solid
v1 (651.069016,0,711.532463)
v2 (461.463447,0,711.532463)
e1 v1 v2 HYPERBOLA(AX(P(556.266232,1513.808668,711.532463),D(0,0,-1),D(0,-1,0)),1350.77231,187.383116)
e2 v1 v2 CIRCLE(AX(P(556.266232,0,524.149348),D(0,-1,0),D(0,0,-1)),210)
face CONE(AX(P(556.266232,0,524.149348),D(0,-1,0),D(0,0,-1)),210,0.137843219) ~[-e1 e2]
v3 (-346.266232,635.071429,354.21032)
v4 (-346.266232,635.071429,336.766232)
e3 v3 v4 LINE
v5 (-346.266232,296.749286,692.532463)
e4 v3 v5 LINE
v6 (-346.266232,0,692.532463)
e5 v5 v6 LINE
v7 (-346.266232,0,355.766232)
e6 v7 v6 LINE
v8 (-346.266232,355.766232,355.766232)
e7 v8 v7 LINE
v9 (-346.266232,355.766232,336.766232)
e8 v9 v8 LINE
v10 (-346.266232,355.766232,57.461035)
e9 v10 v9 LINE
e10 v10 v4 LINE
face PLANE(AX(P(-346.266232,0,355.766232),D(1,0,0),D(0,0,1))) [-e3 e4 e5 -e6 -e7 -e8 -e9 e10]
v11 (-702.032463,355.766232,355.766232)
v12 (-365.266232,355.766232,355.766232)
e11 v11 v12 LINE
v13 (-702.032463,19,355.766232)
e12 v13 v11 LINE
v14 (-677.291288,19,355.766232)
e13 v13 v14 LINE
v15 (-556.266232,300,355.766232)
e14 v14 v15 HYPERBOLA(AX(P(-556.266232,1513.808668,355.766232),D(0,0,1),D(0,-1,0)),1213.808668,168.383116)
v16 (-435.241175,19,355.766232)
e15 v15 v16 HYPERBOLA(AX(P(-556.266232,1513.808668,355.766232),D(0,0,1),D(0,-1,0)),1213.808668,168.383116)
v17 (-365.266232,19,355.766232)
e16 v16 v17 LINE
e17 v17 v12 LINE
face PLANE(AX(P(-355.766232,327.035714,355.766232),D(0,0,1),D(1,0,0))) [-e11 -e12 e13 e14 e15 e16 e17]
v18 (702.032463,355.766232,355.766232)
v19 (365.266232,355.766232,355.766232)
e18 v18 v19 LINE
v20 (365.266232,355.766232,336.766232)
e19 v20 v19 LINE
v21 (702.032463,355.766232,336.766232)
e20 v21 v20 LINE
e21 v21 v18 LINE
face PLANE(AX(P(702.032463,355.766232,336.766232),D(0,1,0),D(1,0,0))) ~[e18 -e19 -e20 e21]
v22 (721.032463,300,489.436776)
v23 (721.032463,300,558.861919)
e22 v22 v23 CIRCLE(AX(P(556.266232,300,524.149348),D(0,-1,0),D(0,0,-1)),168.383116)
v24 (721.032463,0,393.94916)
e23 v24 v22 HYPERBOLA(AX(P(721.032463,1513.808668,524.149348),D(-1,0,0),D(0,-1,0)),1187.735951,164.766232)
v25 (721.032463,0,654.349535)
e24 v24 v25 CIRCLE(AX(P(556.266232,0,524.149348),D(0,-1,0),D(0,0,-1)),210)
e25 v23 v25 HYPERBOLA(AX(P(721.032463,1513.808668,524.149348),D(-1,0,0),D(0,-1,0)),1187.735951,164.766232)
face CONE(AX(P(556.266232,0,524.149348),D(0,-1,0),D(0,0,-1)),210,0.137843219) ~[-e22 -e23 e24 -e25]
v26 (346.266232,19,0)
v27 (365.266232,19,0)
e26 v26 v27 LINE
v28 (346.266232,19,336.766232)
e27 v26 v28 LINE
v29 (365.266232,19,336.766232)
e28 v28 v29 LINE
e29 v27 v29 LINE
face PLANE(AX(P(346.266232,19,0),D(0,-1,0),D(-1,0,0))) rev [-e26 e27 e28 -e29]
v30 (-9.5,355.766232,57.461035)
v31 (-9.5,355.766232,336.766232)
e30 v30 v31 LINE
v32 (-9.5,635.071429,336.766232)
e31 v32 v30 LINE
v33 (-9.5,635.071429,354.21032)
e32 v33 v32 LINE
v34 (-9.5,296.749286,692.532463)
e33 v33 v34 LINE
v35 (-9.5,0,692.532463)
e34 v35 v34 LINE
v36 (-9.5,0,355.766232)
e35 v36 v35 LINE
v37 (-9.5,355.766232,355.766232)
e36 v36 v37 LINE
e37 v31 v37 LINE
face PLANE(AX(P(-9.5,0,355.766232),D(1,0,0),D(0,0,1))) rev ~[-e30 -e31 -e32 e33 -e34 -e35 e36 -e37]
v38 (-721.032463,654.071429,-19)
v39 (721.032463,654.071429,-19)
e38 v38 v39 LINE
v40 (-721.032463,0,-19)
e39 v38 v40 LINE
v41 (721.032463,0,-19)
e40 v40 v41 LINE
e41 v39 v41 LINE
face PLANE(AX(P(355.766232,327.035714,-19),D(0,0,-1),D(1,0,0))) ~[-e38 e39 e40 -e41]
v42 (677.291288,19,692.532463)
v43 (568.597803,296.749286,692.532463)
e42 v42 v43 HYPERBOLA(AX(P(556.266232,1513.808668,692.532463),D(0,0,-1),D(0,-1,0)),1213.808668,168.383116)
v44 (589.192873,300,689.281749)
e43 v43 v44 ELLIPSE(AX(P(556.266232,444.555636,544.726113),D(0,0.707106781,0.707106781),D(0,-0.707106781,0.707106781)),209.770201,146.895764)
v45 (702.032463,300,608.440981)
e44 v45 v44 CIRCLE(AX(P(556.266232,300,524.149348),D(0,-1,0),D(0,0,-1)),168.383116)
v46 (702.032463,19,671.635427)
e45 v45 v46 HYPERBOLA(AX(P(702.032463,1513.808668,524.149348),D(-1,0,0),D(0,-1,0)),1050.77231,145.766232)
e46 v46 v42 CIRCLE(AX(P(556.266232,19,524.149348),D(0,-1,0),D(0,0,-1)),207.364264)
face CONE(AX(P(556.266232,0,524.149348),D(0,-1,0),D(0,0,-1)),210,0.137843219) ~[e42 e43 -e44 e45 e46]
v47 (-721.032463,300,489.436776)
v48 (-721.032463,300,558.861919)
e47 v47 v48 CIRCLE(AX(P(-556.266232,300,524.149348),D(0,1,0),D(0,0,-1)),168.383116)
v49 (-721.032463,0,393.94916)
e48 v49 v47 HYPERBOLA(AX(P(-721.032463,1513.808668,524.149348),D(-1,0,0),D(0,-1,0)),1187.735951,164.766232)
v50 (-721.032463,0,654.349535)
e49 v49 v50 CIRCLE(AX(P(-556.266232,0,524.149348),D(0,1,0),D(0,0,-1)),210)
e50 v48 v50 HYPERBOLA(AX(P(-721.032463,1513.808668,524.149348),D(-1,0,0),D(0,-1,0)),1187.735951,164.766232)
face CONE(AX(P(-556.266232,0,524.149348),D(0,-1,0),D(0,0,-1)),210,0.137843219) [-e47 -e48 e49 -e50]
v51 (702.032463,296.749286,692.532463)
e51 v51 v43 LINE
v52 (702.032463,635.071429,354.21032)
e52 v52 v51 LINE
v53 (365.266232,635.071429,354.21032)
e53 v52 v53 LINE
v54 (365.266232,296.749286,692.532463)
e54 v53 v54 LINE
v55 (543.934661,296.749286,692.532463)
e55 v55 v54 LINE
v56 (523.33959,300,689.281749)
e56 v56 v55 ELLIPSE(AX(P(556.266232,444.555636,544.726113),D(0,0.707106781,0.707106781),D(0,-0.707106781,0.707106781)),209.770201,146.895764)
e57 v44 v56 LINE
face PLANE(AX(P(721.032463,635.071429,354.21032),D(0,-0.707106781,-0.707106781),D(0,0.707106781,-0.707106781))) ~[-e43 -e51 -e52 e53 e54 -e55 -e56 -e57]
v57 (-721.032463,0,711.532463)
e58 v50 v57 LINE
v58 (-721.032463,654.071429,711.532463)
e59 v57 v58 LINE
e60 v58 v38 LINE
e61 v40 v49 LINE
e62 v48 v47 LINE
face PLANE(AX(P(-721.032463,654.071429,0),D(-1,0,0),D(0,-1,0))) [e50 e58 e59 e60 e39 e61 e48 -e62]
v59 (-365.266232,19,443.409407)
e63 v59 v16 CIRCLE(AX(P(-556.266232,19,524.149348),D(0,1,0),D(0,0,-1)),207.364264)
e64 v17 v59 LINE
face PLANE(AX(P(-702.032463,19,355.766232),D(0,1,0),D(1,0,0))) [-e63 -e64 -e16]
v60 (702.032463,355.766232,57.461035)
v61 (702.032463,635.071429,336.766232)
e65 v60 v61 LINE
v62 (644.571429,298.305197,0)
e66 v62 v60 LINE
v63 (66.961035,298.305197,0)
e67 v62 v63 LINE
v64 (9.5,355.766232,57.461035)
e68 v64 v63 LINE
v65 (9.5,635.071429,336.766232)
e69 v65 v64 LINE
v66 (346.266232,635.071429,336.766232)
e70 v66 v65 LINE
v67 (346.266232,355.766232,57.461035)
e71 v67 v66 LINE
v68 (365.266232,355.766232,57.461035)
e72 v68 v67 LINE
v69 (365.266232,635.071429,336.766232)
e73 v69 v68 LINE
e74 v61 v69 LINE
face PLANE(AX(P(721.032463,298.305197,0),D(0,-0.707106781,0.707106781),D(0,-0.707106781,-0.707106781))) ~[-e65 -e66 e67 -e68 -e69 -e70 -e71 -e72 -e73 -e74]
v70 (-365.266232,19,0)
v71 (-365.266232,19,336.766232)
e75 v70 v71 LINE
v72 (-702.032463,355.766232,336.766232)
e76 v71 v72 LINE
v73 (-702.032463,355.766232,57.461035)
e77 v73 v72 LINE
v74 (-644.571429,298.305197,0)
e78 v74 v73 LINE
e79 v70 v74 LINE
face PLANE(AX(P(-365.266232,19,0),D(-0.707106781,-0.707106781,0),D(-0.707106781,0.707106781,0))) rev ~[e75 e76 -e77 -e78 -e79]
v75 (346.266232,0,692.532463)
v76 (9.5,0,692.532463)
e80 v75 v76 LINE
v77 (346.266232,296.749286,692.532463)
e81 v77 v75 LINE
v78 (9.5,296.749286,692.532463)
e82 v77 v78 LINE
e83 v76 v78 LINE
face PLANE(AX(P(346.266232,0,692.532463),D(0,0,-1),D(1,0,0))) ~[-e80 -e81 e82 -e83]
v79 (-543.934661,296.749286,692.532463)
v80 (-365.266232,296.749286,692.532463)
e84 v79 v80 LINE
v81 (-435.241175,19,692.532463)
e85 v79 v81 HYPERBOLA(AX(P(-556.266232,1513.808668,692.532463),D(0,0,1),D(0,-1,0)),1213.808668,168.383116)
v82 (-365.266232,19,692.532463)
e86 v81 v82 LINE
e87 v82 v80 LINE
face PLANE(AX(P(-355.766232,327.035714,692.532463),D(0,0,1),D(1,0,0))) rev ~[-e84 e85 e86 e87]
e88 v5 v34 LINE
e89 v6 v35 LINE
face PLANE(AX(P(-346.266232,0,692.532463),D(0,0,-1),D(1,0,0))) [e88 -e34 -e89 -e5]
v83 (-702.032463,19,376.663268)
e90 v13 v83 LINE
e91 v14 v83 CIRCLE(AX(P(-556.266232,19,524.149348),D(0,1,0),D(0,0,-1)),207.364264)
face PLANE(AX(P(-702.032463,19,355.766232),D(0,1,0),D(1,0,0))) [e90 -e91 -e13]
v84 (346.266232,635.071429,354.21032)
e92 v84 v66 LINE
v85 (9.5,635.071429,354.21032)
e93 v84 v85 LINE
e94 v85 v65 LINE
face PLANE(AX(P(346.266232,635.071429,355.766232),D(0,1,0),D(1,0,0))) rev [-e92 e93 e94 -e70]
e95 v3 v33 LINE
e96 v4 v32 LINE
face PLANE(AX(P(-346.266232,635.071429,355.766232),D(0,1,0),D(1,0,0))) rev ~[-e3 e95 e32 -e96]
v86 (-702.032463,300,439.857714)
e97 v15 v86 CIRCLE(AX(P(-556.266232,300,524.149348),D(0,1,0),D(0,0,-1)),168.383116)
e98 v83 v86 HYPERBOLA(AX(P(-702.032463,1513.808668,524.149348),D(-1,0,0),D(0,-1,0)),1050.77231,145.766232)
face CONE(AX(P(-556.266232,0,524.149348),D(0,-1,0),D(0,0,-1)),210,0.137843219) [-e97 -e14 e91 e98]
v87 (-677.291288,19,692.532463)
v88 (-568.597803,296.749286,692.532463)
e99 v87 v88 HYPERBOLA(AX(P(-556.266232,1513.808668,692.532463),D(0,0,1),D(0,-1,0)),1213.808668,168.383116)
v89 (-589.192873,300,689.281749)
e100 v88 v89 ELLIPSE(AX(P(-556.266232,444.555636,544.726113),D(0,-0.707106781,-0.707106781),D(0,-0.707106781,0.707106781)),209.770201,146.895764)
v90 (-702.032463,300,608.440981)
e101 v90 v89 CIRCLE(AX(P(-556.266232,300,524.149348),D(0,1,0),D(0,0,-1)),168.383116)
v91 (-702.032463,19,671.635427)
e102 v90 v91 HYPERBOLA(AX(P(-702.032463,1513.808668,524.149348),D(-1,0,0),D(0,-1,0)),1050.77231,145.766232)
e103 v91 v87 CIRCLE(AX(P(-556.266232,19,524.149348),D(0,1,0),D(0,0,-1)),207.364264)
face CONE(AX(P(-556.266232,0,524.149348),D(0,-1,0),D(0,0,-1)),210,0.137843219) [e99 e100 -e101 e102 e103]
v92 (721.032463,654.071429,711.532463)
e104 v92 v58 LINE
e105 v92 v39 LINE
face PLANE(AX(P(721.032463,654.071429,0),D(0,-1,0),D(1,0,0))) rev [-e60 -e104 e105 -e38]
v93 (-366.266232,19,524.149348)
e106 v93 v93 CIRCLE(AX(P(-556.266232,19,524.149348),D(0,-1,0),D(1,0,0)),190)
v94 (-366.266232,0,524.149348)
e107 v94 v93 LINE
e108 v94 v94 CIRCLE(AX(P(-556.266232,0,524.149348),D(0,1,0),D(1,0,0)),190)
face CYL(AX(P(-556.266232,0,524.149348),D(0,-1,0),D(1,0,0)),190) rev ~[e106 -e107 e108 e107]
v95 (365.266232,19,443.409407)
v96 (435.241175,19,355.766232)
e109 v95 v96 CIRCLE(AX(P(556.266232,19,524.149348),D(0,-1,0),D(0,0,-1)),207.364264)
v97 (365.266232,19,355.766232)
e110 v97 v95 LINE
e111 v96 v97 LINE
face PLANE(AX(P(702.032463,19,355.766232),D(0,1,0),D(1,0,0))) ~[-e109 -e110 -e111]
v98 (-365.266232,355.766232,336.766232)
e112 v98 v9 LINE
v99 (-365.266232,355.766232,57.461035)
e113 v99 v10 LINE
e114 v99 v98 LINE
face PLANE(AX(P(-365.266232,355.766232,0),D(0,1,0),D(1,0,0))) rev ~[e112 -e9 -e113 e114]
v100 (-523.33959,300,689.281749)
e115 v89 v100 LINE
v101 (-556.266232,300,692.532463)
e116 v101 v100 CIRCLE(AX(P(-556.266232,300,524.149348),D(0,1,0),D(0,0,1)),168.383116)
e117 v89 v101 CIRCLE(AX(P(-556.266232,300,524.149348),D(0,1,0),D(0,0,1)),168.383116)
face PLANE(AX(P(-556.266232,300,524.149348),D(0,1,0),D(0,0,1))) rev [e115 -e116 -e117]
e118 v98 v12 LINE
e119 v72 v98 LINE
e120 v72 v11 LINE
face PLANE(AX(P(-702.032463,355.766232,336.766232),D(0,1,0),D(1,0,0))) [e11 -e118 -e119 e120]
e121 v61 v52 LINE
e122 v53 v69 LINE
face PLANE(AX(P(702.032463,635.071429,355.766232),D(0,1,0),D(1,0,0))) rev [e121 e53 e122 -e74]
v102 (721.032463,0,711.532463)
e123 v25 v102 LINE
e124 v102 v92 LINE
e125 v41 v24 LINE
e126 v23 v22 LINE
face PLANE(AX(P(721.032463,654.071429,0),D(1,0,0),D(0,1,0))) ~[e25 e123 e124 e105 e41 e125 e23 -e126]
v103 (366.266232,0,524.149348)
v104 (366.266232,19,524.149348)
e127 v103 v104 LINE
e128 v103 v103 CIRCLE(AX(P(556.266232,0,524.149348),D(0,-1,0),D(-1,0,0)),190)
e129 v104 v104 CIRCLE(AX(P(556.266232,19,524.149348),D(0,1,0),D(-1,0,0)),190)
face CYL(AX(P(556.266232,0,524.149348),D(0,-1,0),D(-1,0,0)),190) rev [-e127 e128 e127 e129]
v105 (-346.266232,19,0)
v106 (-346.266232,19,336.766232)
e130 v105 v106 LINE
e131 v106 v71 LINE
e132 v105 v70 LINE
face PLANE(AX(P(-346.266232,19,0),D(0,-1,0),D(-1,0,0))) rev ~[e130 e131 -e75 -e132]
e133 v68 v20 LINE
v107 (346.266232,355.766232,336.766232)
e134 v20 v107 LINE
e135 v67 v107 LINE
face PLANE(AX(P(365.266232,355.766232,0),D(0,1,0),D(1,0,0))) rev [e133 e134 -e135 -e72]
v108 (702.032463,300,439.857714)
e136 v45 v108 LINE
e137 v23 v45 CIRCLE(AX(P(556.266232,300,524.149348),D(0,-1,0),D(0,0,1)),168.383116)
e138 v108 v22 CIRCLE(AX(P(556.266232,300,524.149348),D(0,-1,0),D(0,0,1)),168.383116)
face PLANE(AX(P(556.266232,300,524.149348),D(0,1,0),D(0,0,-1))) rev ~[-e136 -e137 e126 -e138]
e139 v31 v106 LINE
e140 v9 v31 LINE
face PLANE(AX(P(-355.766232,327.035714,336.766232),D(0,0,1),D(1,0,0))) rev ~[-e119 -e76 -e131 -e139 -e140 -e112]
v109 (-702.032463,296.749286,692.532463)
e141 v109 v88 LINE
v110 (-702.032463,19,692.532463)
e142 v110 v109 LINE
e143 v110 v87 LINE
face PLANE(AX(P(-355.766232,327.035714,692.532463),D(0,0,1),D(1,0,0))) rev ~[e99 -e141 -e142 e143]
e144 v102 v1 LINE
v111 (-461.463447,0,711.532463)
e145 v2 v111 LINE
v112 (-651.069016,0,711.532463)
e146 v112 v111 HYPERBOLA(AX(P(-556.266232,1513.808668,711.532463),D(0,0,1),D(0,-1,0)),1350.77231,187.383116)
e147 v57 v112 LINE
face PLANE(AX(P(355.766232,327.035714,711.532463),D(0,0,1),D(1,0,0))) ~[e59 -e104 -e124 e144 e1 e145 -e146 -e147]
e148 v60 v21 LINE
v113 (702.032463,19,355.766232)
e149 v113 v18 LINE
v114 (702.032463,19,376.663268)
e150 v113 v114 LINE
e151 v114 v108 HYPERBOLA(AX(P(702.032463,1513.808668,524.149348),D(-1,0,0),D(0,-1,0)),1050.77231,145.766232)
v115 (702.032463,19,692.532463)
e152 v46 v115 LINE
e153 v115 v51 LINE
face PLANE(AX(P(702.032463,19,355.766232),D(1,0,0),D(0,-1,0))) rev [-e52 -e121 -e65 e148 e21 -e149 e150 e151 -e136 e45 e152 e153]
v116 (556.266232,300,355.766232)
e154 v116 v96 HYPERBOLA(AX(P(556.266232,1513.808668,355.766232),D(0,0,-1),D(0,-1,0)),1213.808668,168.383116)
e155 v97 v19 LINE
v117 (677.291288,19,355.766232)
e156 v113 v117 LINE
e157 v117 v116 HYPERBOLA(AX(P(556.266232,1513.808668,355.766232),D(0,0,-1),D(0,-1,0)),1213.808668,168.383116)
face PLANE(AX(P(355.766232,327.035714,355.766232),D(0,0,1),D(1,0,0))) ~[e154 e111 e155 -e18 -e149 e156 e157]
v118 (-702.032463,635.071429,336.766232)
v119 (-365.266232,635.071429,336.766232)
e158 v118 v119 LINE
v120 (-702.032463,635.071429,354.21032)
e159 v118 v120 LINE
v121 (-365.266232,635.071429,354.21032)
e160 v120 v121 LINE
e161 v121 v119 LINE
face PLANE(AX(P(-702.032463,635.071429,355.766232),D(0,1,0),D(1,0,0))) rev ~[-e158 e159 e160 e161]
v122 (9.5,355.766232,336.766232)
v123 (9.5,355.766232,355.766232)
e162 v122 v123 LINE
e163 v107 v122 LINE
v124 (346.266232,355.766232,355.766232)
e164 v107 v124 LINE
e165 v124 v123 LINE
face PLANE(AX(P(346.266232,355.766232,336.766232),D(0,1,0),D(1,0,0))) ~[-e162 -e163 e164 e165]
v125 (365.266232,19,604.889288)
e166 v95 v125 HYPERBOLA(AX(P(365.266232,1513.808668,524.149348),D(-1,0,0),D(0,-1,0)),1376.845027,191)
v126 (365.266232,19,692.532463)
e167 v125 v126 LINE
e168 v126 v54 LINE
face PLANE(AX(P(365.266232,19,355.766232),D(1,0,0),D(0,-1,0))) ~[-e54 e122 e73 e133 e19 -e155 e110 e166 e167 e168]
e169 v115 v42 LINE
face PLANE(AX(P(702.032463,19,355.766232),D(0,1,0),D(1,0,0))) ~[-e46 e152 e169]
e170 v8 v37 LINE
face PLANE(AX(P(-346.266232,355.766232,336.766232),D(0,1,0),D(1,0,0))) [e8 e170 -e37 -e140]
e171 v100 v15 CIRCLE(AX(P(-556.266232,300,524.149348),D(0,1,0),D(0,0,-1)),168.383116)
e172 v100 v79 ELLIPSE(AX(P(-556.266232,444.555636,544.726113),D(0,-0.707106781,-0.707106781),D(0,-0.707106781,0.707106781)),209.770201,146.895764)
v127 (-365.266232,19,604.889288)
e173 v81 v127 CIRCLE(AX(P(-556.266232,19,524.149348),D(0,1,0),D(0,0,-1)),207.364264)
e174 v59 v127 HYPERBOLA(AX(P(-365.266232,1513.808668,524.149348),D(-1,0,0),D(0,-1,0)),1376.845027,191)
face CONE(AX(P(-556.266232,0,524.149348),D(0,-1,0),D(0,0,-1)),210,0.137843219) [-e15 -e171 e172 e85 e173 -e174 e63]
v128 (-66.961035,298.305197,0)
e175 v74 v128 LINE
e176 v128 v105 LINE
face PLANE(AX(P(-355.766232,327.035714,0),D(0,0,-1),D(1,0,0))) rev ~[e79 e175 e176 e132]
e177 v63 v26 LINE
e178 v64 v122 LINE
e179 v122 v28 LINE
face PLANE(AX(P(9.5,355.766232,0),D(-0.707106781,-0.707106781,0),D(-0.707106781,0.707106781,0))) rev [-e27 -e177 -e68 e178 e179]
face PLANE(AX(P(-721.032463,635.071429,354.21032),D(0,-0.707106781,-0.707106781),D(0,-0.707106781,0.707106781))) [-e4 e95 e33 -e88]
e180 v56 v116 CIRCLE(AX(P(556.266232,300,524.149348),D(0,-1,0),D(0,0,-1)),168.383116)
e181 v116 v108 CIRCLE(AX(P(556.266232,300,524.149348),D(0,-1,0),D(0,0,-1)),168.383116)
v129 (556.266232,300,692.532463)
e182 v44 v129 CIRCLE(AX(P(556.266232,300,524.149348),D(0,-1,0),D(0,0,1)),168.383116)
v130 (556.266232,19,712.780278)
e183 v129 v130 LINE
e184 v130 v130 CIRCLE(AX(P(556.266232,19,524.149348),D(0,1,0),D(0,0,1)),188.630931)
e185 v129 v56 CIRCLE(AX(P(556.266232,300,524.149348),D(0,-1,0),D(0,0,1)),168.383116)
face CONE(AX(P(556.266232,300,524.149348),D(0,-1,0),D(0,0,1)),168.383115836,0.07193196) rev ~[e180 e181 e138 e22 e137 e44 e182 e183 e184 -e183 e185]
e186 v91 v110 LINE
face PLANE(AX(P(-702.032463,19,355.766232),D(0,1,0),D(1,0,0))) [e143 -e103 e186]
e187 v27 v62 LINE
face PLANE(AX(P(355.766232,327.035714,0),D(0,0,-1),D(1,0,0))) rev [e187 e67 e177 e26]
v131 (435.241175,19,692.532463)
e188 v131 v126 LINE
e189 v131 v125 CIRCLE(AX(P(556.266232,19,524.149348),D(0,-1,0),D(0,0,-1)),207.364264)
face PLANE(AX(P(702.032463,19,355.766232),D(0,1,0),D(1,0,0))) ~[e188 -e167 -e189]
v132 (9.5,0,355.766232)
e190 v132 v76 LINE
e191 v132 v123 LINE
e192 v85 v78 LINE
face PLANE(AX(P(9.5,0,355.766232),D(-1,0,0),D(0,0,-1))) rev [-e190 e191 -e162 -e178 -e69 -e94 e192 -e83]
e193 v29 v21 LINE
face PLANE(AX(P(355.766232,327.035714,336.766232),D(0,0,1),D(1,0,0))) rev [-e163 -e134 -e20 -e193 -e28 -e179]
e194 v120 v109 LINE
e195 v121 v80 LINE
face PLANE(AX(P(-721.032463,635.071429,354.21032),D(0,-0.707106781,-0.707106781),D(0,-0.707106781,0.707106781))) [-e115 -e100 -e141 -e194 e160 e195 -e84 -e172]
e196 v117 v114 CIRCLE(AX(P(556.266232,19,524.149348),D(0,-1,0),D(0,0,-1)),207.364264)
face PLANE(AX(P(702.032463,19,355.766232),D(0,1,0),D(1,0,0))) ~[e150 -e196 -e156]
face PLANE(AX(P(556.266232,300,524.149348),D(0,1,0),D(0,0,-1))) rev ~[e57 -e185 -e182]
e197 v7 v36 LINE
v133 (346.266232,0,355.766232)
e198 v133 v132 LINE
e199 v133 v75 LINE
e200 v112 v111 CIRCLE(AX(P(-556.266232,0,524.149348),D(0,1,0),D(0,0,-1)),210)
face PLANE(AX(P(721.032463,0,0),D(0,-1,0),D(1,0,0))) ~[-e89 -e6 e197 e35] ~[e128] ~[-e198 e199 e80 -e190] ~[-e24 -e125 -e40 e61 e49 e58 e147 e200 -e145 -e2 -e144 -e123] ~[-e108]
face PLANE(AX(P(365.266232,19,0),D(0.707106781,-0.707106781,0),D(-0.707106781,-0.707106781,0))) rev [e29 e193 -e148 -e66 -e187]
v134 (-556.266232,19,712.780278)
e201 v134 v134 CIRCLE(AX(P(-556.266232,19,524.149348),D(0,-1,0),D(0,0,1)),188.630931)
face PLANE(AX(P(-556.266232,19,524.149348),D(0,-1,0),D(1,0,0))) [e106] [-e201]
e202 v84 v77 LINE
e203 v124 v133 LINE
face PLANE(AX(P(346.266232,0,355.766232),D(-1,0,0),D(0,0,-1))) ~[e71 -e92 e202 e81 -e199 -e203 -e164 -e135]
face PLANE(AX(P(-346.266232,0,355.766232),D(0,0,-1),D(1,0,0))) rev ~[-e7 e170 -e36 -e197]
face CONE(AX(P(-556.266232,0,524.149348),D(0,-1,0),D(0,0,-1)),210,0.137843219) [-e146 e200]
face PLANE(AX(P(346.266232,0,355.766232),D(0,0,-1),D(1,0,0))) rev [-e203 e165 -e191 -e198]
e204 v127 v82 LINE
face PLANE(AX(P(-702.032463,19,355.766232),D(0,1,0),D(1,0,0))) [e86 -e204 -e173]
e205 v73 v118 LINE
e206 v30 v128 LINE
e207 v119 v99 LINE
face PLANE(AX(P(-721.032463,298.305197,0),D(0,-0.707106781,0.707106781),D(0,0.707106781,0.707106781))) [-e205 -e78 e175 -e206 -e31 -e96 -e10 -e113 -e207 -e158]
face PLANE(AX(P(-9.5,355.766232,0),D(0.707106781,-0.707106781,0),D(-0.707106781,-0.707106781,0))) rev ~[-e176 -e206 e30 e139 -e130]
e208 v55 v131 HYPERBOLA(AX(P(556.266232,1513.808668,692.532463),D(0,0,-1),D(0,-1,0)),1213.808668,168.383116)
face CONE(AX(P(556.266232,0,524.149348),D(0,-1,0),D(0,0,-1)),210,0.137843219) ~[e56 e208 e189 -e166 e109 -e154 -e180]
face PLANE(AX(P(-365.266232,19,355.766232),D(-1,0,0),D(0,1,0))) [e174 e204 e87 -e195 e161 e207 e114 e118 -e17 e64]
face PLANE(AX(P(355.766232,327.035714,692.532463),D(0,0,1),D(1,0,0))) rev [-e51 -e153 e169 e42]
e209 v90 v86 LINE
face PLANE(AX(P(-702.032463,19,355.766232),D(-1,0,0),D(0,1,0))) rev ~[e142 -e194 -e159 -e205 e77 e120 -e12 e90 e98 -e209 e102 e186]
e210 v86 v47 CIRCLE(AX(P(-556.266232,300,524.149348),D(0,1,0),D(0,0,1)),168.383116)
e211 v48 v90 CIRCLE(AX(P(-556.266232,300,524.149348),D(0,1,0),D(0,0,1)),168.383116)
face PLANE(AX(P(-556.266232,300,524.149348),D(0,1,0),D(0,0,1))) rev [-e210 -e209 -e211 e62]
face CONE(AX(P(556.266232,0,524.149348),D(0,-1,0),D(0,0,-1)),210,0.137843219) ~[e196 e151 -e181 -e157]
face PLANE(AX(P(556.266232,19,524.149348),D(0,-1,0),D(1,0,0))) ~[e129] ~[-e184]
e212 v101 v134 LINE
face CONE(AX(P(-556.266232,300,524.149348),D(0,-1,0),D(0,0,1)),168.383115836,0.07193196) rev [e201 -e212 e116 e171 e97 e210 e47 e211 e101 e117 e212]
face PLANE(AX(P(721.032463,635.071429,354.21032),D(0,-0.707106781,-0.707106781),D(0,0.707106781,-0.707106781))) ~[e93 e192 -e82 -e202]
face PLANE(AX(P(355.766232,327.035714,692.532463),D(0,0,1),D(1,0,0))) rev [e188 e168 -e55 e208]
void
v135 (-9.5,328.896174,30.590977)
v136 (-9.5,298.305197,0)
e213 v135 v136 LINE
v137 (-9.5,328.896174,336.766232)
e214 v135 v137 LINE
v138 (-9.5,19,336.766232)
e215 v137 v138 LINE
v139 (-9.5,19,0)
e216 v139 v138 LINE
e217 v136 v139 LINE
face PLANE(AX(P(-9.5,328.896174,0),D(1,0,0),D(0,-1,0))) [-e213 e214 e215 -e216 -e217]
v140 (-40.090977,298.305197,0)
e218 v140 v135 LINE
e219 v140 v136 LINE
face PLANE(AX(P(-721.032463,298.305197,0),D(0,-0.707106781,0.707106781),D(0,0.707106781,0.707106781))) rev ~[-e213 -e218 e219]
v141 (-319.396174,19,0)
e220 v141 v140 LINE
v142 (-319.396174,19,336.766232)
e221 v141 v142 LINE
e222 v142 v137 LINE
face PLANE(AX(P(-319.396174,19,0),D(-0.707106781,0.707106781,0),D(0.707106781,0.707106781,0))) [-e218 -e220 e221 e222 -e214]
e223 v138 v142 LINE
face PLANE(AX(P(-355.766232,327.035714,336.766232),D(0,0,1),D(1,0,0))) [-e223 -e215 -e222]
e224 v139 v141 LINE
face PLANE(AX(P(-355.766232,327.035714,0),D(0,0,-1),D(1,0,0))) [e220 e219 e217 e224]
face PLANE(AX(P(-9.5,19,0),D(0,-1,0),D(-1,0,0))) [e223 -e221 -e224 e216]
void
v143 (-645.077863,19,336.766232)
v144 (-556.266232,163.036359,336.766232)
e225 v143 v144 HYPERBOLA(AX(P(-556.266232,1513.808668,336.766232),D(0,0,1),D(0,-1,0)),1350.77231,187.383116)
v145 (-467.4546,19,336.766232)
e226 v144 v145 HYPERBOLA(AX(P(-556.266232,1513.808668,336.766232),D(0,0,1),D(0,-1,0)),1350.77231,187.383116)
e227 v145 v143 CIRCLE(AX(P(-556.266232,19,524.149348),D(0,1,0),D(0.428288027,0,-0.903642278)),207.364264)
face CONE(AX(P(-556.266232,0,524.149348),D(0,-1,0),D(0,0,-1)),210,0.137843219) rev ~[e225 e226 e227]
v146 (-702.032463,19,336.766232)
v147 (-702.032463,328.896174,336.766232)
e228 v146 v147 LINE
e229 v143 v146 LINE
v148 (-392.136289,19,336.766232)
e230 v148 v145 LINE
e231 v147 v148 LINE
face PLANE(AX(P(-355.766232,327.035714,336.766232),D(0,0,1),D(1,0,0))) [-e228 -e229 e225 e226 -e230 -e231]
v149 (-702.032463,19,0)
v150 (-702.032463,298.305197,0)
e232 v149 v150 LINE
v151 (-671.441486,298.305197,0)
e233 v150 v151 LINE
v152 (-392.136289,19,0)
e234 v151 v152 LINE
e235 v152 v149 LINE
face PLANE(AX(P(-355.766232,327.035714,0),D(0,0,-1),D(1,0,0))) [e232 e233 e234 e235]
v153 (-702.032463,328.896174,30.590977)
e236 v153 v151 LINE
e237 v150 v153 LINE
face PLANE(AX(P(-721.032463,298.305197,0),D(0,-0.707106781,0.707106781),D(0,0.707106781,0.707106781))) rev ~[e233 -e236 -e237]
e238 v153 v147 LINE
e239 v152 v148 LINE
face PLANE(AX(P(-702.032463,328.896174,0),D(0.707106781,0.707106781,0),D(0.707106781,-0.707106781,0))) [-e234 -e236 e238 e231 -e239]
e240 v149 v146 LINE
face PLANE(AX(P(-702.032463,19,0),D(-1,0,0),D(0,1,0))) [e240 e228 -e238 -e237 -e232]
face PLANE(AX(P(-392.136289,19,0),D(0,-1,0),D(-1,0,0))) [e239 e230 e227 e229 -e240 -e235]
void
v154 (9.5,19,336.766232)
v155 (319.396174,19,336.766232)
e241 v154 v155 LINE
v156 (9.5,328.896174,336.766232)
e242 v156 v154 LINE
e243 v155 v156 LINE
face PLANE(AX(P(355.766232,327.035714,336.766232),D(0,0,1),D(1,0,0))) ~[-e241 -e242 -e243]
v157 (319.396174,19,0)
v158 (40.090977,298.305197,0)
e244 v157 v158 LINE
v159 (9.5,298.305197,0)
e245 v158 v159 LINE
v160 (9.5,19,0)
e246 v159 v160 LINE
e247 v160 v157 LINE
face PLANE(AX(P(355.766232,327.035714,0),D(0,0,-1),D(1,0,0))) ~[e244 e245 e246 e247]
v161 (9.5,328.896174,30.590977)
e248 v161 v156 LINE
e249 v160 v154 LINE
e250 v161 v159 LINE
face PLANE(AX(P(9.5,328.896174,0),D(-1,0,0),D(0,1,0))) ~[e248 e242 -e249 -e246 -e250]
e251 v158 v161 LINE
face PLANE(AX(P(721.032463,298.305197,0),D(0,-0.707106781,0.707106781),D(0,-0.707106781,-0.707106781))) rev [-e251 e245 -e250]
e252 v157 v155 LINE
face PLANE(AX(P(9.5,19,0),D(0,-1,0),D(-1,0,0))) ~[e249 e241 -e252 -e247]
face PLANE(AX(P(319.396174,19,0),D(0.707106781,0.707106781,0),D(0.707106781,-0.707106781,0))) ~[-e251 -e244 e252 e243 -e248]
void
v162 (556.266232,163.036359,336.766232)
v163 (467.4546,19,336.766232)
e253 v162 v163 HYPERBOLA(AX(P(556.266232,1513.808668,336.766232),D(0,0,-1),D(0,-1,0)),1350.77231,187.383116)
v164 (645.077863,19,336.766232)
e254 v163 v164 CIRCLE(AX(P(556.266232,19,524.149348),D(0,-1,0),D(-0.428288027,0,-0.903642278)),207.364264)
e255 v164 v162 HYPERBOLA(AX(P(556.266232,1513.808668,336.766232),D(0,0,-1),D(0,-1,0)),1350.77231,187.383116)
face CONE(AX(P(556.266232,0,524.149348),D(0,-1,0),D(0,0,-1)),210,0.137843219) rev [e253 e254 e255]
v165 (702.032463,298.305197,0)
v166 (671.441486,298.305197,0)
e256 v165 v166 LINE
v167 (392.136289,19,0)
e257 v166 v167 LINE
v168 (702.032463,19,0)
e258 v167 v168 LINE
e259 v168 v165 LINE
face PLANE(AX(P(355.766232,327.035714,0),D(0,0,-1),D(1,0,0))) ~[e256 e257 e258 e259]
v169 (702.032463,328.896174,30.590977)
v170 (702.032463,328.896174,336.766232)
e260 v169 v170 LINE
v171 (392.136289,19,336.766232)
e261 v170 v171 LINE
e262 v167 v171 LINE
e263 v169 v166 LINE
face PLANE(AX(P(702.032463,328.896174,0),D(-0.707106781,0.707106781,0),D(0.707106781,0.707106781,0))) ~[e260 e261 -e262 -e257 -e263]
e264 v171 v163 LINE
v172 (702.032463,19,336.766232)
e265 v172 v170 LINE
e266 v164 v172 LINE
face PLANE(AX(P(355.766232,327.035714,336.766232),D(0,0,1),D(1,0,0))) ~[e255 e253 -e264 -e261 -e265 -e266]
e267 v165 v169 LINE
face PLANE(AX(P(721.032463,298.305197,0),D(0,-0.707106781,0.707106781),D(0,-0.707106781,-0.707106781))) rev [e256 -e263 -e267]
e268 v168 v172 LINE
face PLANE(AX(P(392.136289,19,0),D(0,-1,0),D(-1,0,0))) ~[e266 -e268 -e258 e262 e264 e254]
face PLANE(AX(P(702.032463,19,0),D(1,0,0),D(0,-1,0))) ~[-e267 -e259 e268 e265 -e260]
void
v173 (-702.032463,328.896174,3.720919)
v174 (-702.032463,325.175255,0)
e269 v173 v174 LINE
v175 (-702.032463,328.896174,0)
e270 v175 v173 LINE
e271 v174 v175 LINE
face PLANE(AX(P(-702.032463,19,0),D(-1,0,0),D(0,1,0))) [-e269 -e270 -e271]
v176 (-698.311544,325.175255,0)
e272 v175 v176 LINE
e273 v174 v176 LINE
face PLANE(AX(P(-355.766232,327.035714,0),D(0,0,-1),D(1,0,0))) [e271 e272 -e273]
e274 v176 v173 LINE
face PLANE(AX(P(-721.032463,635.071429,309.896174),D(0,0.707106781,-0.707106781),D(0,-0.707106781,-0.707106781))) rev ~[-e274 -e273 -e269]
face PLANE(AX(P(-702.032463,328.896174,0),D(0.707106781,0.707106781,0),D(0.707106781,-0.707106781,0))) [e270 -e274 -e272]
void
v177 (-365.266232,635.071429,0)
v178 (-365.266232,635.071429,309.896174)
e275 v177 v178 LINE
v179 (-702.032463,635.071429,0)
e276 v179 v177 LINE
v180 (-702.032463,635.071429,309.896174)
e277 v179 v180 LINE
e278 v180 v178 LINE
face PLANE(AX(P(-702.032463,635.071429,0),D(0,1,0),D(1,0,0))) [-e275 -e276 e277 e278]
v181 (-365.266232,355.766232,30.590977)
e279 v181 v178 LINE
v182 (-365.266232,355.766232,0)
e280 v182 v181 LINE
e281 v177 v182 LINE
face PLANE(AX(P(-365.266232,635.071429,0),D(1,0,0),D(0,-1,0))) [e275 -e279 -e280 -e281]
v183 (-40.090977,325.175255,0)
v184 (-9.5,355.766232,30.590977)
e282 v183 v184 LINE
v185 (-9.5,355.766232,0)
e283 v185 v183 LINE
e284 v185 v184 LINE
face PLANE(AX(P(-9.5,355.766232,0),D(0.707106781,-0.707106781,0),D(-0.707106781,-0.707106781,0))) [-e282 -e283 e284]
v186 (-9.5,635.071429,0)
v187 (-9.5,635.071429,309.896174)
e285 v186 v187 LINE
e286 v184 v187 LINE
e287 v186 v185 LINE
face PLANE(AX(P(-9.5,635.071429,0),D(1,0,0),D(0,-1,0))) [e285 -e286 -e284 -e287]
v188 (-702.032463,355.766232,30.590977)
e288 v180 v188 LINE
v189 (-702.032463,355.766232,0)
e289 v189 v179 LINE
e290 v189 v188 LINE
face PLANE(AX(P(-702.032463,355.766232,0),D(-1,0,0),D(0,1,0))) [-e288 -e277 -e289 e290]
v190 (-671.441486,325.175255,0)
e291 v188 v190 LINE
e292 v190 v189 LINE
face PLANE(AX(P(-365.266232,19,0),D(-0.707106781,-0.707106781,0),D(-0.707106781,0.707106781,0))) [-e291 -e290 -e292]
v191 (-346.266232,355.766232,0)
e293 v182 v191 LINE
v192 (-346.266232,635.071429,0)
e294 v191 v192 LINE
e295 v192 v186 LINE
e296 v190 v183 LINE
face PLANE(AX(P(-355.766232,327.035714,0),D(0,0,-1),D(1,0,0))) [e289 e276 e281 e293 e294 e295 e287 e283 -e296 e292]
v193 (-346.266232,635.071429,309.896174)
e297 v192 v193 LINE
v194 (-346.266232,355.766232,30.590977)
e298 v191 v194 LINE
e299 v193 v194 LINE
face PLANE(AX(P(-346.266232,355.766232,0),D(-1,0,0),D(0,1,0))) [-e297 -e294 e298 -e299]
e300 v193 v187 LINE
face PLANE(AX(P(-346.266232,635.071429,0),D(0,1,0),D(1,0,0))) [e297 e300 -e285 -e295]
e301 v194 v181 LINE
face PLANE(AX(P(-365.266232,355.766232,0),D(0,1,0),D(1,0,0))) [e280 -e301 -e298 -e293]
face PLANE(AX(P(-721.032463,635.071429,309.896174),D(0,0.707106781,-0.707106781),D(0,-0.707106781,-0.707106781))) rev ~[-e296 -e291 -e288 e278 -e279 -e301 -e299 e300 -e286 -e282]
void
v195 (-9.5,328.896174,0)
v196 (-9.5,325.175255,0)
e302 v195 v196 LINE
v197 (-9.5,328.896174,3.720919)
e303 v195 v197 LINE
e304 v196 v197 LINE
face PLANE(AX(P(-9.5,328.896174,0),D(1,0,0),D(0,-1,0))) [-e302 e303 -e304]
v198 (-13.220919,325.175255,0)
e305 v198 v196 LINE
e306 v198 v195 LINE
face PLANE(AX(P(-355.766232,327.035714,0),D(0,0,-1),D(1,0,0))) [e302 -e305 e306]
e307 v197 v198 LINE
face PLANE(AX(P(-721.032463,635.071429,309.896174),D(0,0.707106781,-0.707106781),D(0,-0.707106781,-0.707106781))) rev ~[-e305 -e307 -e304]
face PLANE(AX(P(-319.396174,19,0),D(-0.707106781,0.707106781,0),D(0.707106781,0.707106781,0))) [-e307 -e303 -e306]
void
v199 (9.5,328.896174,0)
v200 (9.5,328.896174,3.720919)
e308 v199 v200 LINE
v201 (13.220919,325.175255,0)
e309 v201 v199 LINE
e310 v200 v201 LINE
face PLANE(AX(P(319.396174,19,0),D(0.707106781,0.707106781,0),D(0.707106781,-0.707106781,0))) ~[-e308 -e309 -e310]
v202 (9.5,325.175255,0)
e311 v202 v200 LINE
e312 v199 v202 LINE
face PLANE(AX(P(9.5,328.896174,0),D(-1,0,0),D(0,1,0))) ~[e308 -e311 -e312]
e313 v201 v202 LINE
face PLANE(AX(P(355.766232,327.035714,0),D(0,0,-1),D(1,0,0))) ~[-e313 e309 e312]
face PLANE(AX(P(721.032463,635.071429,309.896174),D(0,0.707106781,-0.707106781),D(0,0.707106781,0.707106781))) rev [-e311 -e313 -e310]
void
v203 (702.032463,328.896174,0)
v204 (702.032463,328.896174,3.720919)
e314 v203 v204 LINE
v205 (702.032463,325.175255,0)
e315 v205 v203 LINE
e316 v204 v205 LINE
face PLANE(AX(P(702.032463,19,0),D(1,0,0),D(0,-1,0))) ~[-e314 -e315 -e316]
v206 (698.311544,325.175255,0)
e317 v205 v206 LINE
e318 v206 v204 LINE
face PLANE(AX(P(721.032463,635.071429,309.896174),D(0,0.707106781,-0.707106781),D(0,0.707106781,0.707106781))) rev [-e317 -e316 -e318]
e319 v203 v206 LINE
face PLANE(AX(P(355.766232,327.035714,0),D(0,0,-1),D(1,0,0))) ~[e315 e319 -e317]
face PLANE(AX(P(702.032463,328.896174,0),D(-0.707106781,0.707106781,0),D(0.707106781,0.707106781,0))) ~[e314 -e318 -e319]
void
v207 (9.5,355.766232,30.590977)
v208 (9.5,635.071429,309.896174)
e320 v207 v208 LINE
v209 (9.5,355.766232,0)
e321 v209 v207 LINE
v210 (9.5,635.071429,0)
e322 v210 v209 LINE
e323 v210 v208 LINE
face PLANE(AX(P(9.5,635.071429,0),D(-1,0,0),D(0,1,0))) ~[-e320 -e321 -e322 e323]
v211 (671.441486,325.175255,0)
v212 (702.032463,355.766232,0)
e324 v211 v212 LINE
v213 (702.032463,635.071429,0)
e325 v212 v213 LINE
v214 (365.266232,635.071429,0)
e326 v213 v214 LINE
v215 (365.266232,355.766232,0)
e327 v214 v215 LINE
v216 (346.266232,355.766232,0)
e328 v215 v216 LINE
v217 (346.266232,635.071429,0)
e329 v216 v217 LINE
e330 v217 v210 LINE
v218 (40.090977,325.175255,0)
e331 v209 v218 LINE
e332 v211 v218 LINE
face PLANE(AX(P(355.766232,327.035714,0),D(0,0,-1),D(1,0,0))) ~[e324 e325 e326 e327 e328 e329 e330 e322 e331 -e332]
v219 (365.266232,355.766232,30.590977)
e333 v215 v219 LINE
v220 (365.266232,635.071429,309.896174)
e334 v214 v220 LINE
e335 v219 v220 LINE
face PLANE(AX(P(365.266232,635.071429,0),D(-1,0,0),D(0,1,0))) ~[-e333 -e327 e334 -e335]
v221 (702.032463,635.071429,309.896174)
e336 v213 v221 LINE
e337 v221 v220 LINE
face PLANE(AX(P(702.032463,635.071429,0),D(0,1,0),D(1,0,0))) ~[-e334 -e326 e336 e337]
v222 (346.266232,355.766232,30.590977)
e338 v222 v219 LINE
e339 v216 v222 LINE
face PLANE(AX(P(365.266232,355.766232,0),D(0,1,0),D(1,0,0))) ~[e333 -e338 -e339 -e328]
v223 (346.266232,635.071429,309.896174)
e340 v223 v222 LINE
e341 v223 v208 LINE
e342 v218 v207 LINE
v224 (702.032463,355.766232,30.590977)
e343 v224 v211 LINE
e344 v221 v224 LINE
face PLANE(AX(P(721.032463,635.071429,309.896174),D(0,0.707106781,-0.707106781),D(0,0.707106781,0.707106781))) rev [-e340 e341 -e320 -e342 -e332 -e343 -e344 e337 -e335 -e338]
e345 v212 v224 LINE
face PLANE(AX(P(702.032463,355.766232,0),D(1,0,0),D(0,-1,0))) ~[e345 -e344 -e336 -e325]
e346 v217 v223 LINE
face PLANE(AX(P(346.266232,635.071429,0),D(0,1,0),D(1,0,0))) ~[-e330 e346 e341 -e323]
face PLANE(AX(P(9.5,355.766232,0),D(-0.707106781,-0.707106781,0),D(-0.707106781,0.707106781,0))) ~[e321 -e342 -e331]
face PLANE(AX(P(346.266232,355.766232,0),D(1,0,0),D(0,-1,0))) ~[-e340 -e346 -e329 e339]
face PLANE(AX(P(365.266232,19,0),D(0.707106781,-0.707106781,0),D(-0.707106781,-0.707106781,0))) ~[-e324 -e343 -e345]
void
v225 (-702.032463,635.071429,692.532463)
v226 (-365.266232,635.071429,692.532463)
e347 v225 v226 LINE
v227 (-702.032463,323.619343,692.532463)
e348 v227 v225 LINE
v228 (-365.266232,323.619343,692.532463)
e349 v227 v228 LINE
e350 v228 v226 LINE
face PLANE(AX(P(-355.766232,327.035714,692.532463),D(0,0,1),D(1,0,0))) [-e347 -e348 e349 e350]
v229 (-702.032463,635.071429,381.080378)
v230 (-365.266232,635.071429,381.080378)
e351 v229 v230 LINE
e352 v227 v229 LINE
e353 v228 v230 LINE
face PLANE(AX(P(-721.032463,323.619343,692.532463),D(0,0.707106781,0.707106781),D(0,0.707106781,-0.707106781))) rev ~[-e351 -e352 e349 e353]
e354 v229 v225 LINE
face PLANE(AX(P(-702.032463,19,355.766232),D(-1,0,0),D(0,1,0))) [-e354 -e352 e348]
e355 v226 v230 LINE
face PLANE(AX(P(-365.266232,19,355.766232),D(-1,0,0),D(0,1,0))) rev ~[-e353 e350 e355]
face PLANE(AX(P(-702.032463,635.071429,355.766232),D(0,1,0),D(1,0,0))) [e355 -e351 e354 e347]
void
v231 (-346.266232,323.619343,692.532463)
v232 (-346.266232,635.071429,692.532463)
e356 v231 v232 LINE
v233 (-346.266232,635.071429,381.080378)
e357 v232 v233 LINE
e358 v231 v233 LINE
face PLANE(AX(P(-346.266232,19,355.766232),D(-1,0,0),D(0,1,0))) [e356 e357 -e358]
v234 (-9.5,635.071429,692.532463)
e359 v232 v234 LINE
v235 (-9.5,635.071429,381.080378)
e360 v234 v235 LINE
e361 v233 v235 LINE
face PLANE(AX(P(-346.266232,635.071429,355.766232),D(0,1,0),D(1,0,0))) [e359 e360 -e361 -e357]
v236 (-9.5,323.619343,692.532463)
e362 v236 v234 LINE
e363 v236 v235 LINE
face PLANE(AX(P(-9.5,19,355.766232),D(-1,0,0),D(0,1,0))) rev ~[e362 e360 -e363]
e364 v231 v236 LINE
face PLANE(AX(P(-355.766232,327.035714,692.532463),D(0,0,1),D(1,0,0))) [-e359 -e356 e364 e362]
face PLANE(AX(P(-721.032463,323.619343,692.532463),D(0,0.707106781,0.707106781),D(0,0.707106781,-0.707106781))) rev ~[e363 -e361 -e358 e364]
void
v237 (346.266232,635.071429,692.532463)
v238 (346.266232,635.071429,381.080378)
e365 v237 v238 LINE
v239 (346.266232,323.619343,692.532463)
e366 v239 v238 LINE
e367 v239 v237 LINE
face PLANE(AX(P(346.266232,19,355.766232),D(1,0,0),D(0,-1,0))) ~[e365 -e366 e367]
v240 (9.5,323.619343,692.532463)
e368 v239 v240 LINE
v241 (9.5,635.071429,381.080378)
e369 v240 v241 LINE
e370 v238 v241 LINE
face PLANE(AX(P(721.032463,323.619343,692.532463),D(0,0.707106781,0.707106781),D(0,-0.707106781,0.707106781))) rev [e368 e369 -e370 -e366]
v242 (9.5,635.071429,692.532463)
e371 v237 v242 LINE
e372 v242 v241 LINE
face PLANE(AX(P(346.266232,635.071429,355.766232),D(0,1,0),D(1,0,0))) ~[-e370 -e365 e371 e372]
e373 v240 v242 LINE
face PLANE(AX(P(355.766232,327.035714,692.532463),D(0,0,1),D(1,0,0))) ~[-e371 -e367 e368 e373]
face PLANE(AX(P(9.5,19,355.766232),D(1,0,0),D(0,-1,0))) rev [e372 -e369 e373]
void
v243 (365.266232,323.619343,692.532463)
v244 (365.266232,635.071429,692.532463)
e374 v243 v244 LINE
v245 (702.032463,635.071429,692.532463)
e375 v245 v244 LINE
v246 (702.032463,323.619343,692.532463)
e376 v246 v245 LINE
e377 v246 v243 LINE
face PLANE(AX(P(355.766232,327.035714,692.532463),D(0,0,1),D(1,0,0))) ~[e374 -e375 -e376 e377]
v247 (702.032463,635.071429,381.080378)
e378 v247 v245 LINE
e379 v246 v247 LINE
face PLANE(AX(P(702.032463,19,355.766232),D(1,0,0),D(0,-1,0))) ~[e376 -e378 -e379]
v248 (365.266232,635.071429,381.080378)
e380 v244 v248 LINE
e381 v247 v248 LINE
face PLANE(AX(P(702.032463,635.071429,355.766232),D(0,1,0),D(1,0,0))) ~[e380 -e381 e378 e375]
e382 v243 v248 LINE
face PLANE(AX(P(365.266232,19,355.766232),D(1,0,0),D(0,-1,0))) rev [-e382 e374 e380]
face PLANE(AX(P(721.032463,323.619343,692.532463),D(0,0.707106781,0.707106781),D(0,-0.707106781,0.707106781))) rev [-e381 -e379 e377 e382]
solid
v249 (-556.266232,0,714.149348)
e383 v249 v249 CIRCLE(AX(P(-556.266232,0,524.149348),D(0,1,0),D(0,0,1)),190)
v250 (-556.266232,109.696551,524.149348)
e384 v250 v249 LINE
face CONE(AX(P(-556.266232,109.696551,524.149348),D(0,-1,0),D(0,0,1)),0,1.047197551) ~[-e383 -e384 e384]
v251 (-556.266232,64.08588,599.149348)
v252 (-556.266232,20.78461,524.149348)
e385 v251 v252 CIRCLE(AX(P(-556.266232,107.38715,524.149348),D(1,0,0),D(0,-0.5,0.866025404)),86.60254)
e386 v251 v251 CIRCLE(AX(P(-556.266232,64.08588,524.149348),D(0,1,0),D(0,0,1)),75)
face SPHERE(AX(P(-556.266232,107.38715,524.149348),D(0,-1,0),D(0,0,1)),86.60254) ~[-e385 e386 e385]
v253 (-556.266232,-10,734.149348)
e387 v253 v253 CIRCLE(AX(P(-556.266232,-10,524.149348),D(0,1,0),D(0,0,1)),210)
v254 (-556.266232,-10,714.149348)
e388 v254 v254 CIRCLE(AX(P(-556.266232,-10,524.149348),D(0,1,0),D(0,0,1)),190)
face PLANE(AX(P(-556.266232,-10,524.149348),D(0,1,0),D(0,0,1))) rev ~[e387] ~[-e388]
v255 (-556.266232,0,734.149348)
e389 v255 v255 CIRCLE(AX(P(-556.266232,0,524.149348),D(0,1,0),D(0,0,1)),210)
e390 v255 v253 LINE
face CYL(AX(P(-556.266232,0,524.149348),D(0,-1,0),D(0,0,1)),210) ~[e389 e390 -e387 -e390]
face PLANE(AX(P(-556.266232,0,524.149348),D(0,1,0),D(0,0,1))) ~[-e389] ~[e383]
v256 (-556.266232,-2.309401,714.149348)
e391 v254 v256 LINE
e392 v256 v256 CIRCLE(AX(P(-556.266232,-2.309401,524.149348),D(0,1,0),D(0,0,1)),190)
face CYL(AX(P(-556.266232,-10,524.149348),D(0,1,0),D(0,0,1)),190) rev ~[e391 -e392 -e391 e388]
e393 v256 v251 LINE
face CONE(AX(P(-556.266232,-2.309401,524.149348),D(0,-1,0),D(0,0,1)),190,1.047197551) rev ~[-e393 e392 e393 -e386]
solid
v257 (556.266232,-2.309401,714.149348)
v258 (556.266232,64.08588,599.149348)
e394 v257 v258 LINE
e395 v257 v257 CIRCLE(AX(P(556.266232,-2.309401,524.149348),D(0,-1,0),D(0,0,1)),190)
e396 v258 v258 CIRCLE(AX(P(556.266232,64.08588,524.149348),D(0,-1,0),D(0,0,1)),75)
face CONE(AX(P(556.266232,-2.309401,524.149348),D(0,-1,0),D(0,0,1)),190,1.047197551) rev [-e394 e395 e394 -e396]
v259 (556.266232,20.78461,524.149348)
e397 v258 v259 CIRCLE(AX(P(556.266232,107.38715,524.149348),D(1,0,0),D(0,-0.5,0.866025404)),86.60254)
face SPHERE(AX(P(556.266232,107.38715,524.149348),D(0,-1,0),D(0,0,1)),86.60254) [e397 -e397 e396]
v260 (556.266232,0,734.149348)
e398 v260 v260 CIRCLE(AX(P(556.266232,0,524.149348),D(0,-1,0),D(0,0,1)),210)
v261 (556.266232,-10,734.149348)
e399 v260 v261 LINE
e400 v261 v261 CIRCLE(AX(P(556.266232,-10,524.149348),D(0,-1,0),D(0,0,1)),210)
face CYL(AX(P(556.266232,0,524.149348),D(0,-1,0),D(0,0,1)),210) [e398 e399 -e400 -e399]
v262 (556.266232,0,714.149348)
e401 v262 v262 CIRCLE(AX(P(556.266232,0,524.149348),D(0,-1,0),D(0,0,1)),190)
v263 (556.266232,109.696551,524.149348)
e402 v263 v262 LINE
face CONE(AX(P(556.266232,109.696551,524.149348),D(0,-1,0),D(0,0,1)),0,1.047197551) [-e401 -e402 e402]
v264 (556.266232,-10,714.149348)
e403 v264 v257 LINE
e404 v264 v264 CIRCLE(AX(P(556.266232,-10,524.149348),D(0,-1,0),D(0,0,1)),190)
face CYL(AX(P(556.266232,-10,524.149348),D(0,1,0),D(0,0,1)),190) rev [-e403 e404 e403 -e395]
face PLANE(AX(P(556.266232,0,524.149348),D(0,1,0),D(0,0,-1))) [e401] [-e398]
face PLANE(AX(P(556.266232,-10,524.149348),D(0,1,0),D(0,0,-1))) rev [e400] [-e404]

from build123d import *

# Parameters (mm, degrees)
F3_W      = 730.5324633441
F3_H      = 654.0714285714
F4_DEPTH  = 336.766231672
F6_DEPTH  = 730.5324633441
F7_W      = 730.5324633441
F7_H      = 654.0714285714
F7_W_2    = 336.766231672
F7_H_2    = 279.3051968994
F8_DEPTH  = 19
F9_W      = 730.5324633441
F9_H      = 654.0714285714
F9_W_2    = 336.766231672
F9_H_2    = 616.0714285714
F10_DEPTH = 336.766231672
F12_DEPTH = 730.5324633441
F13_W     = 730.5324633441
F13_H     = 654.0714285714
F14_DEPTH = 19
F15_W     = 730.5324633441
F15_H     = 654.0714285714
F16_DEPTH = 19
F17_W     = 336.766231672
F17_H     = 336.766231672
F18_DEPTH = 25
F22_R     = 190
F23_DEPTH = 19


with BuildPart() as f4:
    # F3 (on Top) → F4 (new body)
    with BuildSketch(Plane.XY):
        with Locations((-355.766231672, 327.0357142857)):
            Rectangle(F3_W, F3_H)
        Polygon((-392.1362893571, 19), (-702.0324633441, 19), (-702.0324633441, 328.896173987), align=None, mode=Mode.SUBTRACT)
        Polygon((-702.0324633441, 355.766231672), (-702.0324633441, 635.0714285714), (-365.266231672, 635.0714285714), (-365.266231672, 355.766231672), (-346.266231672, 355.766231672), (-346.266231672, 635.0714285714), (-9.5, 635.0714285714), (-9.5, 355.766231672), (-346.266231672, 19), (-365.266231672, 19), align=None, mode=Mode.SUBTRACT)
        Polygon((-9.5, 19), (-319.396173987, 19), (-9.5, 328.896173987), align=None, mode=Mode.SUBTRACT)
    extrude(amount=F4_DEPTH)

    # F5 (on face) → F6 (join, through all)
    with BuildSketch(Plane(origin=(-721.0324633441, 0, 0), x_dir=(0, -1, 0), z_dir=(-1, 0, 0))):
        Polygon((-298.3051968994, 0), (-635.0714285714, 336.766231672), (-635.0714285714, 309.896173987), (-325.1752545845, 0), align=None)
    extrude(amount=-F6_DEPTH)

    # F7 (on face) → F8 (join)
    with BuildSketch(Plane.XY.offset(336.766231672)):
        with Locations((-355.766231672, 327.0357142857)):
            Rectangle(F7_W, F7_H)
        with Locations((-533.6493475081, 495.4188301217)):
            Rectangle(F7_W_2, F7_H_2, mode=Mode.SUBTRACT)
        with Locations((-177.883115836, 495.4188301217)):
            Rectangle(F7_W_2, F7_H_2, mode=Mode.SUBTRACT)
    extrude(amount=F8_DEPTH)

    # F9 (on face) → F10 (join)
    with BuildSketch(Plane.XY.offset(355.766231672)):
        with Locations((-355.766231672, 327.0357142857)):
            Rectangle(F9_W, F9_H)
        with Locations((-533.6493475081, 327.0357142857)):
            Rectangle(F9_W_2, F9_H_2, mode=Mode.SUBTRACT)
        with Locations((-177.883115836, 327.0357142857)):
            Rectangle(F9_W_2, F9_H_2, mode=Mode.SUBTRACT)
    extrude(amount=F10_DEPTH)

    # F11 (on face) → F12 (join, through all)
    with BuildSketch(Plane(origin=(-721.0324633441, 0, 0), x_dir=(0, -1, 0), z_dir=(-1, 0, 0))):
        Polygon((-296.7492855239, 692.5324633441), (-323.619343209, 692.5324633441), (-635.0714285714, 381.0803779817), (-635.0714285714, 354.2103202966), align=None)
    extrude(amount=-F12_DEPTH)

    # F13 (on face) → F14 (join)
    with BuildSketch(Plane.XY.offset(692.5324633441)):
        with Locations((-355.766231672, 327.0357142857)):
            Rectangle(F13_W, F13_H)
    extrude(amount=F14_DEPTH)

    # F15 (on face) → F16 (join)
    with BuildSketch(Plane(origin=(0, 0, 0), x_dir=(1, 0, 0), z_dir=(0, 0, -1))):
        with Locations((-355.766231672, -327.0357142857)):
            Rectangle(F15_W, F15_H)
    extrude(amount=F16_DEPTH)

    # F17 (on face) → F18 (cut)
    with BuildSketch(Plane.XZ):
        with Locations((-177.883115836, 524.1493475081)):
            Rectangle(F17_W, F17_H)
    extrude(amount=-F18_DEPTH, mode=Mode.SUBTRACT)

    # F20 (on offset) → F21 (revolve)
    with BuildSketch(Plane.YZ.offset(-556.266231672)):
        Polygon((300, 524.1493475081), (0, 524.1493475081), (0, 314.1493475081), (300, 355.766231672), align=None)
    revolve(axis=Axis((-556.266231672, 150, 524.1493475081), (0, 1, 0)))

    # F22 (on face) → F23 (cut)
    with BuildSketch(Plane.XZ):
        with Locations((-556.266231672, 524.1493475081)):
            Circle(F22_R)
    extrude(amount=-F23_DEPTH, mode=Mode.SUBTRACT)

    # F24 (on offset) → F25 (revolve, cut)
    with BuildSketch(Plane.YZ.offset(-556.266231672)):
        Polygon((0, 714.1493475081), (0, 524.1493475081), (300, 524.1493475081), (300, 692.5324633441), align=None)
    revolve(axis=Axis((-556.266231672, 150, 524.1493475081), (0, 1, 0)), mode=Mode.SUBTRACT)

    # F26: F4 across plane


with BuildPart() as f4_1:
    add(f4.part)
    add(f4.part.mirror(Plane.YZ))


with BuildPart() as f28:
    # F27 (on offset) → F28 (revolve)
    with BuildSketch(Plane.YZ.offset(-556.266231672)):
        with BuildLine():
            Line((0, 734.1493475081), (-10, 734.1493475081))
            Line((-10, 734.1493475081), (-10, 714.1493475081))
            Line((-10, 714.1493475081), (-2.3094010768, 714.1493475081))
            Line((-2.3094010768, 714.1493475081), (64.08587988, 599.1493475081))
            ThreePointArc((64.08587988, 599.1493475081), (32.3871500693, 567.4506176973), (20.7846096908, 524.1493475081))
            Line((20.7846096908, 524.1493475081), (109.696551146, 524.1493475081))
            Line((109.696551146, 524.1493475081), (0, 714.1493475081))
            Line((0, 714.1493475081), (0, 734.1493475081))
        make_face()
    revolve(axis=Axis((-556.266231672, 103.9801740821, 524.1493475081), (0, 1, 0)))


with BuildPart() as f29_1:
    # F29: instance of F28
    add(f28.part.mirror(Plane.YZ))


solid = Compound([f4_1.part, f28.part, f29_1.part])
